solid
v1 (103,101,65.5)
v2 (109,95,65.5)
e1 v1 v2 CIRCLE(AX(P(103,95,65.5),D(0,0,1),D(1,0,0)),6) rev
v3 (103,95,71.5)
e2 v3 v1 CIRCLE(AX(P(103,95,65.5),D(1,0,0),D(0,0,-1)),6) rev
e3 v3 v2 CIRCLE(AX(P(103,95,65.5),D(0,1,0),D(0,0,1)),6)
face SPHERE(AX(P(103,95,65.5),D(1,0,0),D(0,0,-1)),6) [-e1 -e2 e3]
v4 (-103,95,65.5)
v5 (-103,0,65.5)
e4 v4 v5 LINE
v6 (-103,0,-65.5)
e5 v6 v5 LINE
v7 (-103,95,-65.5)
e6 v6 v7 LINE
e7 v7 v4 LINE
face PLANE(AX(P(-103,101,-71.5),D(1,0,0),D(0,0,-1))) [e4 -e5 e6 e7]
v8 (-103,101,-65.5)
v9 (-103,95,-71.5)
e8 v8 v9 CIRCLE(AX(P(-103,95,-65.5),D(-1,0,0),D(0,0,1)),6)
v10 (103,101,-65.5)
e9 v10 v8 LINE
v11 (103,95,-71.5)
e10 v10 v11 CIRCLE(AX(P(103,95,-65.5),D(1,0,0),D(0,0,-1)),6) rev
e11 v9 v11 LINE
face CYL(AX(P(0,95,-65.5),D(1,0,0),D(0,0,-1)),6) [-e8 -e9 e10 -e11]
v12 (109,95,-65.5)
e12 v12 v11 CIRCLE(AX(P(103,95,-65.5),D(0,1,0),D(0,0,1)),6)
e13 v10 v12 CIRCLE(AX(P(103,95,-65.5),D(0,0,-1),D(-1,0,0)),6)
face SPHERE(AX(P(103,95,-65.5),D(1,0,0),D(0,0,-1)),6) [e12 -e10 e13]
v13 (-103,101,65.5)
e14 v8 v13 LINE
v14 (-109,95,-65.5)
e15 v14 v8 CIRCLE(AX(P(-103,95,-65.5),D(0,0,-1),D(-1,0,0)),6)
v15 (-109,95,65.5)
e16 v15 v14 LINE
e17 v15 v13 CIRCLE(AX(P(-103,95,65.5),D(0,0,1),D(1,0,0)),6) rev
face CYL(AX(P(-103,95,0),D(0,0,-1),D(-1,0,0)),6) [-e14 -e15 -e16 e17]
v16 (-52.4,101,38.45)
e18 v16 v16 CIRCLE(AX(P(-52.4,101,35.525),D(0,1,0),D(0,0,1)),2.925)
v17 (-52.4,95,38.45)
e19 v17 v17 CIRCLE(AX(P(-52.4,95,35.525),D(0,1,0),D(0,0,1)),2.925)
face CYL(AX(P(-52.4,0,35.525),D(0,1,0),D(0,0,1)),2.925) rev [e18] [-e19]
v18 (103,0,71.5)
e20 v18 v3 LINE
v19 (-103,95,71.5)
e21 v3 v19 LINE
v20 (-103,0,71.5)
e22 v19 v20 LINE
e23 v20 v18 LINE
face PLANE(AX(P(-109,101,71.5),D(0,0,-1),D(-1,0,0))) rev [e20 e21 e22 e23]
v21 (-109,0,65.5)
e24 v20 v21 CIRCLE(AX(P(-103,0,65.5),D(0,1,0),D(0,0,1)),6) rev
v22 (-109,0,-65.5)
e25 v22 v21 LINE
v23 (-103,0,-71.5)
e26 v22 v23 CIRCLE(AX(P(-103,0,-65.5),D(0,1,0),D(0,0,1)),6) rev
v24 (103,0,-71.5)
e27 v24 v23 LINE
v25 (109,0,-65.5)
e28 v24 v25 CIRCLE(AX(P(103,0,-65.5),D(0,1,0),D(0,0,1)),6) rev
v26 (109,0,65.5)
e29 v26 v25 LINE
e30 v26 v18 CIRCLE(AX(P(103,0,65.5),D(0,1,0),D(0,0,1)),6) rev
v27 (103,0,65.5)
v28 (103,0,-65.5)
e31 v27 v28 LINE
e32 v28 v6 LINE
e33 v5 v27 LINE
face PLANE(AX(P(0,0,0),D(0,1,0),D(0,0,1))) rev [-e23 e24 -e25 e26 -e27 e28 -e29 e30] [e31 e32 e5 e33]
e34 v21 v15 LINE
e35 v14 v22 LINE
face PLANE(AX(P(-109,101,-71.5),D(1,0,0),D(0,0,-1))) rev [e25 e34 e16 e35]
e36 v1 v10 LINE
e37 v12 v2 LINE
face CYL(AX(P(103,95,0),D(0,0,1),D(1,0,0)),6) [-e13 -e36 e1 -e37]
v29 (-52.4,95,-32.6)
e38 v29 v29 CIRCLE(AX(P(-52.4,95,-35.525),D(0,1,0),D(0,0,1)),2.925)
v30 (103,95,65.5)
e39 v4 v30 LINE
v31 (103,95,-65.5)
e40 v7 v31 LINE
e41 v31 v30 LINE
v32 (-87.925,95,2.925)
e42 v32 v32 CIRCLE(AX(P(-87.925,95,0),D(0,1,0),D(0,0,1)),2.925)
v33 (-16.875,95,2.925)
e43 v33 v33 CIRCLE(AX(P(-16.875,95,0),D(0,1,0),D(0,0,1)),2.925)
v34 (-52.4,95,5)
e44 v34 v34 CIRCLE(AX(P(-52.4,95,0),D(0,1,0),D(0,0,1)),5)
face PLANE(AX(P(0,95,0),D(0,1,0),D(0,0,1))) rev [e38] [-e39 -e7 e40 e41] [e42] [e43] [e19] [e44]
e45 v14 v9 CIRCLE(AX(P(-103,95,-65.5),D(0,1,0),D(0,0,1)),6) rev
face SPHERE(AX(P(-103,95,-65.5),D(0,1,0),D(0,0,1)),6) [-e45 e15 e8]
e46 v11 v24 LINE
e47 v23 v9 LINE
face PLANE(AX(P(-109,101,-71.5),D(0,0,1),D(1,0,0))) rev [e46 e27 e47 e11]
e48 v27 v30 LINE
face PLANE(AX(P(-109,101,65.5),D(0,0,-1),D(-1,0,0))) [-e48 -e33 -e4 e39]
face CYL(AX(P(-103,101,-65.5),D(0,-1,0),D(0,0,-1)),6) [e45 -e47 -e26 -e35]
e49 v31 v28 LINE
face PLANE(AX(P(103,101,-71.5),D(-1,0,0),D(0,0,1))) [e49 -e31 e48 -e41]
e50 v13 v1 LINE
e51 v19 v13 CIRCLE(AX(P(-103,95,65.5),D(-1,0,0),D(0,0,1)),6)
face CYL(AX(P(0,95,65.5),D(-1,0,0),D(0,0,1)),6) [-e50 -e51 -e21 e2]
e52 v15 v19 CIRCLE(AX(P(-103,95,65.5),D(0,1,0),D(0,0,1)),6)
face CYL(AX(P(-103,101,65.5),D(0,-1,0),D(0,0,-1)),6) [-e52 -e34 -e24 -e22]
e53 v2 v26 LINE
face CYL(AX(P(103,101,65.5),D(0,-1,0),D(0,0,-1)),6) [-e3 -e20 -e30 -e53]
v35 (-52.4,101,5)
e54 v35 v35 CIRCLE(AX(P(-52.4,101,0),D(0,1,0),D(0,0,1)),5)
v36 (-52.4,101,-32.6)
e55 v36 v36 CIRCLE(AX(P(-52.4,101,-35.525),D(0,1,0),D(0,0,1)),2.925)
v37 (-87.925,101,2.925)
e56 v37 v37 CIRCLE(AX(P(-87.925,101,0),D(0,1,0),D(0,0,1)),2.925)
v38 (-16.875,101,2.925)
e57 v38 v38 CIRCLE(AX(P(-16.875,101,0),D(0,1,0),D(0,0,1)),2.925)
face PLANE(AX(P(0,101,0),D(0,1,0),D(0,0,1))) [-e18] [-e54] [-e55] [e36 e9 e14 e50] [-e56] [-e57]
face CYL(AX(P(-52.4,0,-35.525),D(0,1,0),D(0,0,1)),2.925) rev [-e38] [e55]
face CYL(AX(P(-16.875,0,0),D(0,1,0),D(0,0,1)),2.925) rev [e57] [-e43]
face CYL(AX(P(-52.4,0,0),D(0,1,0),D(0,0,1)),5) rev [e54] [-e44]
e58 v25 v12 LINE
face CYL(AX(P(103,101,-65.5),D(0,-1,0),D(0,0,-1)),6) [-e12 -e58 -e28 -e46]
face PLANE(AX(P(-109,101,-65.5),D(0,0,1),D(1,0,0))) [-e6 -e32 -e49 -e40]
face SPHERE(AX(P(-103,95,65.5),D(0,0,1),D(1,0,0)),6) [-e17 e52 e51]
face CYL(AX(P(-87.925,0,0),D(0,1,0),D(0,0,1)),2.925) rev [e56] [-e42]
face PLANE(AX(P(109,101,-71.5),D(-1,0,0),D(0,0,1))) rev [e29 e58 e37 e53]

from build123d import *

# Parameters (mm, degrees)
SKETCH1_W           = 218
SKETCH1_H           = 143
BOSS_EXTRUDE1_DEPTH = 101
FILLET1_R           = 6
SHELL1_START        = -103
SHELL1_OUTLINE_W    = 95
SHELL1_OUTLINE_H    = 131
SHELL1_DEPTH        = 206
SKETCH2_R           = 5
SKETCH2_R_2         = 2.925
CUT_EXTRUDE1_DEPTH  = 165.906791855


# Read off the part's stored shape, not the designer's step: Shell1
with BuildPart() as part:
    # Sketch1 → Boss-Extrude1 (new body)
    with BuildSketch(Plane(origin=(0, 0, 0), x_dir=(1, 0, 0), z_dir=(0, 1, 0))):
        Rectangle(SKETCH1_W, SKETCH1_H)
    extrude(amount=BOSS_EXTRUDE1_DEPTH)

    # Fillet1
    fillet1_edges = [part.edges().sort_by_distance(p)[0] for p in [
        (-109, 101, 0),
        (0, 101, 71.5),
        (109, 101, 0),
        (109, 50.5, 71.5),
        (-109, 50.5, 71.5),
        (-109, 50.5, -71.5),
        (109, 50.5, -71.5),
        (0, 101, -71.5),
    ]]
    fillet(fillet1_edges, radius=FILLET1_R)

    # Shell1 outline → Shell1 (cut)
    with BuildSketch(Plane.YZ.offset(SHELL1_START)):
        with Locations((47.5, 0)):
            Rectangle(SHELL1_OUTLINE_W, SHELL1_OUTLINE_H)
    extrude(amount=SHELL1_DEPTH, mode=Mode.SUBTRACT)

    # Sketch2 → Cut-Extrude1 (cut, through all)
    with BuildSketch(Plane(origin=(0, 101, 0), x_dir=(1, 0, 0), z_dir=(0, 1, 0))):
        with Locations(Location((-52.4, 0, 0), (0, 0, 270))):
            Circle(SKETCH2_R)
        with Locations(Location((-52.4, 35.525, 0), (0, 0, 270))):
            Circle(SKETCH2_R_2)
        with Locations(Location((-87.925, 0, 0), (0, 0, 270))):
            Circle(SKETCH2_R_2)
        with Locations(Location((-52.4, -35.525, 0), (0, 0, 270))):
            Circle(SKETCH2_R_2)
        with Locations(Location((-16.875, 0, 0), (0, 0, 270))):
            Circle(SKETCH2_R_2)
    extrude(amount=-CUT_EXTRUDE1_DEPTH, mode=Mode.SUBTRACT)


solid = part.part
